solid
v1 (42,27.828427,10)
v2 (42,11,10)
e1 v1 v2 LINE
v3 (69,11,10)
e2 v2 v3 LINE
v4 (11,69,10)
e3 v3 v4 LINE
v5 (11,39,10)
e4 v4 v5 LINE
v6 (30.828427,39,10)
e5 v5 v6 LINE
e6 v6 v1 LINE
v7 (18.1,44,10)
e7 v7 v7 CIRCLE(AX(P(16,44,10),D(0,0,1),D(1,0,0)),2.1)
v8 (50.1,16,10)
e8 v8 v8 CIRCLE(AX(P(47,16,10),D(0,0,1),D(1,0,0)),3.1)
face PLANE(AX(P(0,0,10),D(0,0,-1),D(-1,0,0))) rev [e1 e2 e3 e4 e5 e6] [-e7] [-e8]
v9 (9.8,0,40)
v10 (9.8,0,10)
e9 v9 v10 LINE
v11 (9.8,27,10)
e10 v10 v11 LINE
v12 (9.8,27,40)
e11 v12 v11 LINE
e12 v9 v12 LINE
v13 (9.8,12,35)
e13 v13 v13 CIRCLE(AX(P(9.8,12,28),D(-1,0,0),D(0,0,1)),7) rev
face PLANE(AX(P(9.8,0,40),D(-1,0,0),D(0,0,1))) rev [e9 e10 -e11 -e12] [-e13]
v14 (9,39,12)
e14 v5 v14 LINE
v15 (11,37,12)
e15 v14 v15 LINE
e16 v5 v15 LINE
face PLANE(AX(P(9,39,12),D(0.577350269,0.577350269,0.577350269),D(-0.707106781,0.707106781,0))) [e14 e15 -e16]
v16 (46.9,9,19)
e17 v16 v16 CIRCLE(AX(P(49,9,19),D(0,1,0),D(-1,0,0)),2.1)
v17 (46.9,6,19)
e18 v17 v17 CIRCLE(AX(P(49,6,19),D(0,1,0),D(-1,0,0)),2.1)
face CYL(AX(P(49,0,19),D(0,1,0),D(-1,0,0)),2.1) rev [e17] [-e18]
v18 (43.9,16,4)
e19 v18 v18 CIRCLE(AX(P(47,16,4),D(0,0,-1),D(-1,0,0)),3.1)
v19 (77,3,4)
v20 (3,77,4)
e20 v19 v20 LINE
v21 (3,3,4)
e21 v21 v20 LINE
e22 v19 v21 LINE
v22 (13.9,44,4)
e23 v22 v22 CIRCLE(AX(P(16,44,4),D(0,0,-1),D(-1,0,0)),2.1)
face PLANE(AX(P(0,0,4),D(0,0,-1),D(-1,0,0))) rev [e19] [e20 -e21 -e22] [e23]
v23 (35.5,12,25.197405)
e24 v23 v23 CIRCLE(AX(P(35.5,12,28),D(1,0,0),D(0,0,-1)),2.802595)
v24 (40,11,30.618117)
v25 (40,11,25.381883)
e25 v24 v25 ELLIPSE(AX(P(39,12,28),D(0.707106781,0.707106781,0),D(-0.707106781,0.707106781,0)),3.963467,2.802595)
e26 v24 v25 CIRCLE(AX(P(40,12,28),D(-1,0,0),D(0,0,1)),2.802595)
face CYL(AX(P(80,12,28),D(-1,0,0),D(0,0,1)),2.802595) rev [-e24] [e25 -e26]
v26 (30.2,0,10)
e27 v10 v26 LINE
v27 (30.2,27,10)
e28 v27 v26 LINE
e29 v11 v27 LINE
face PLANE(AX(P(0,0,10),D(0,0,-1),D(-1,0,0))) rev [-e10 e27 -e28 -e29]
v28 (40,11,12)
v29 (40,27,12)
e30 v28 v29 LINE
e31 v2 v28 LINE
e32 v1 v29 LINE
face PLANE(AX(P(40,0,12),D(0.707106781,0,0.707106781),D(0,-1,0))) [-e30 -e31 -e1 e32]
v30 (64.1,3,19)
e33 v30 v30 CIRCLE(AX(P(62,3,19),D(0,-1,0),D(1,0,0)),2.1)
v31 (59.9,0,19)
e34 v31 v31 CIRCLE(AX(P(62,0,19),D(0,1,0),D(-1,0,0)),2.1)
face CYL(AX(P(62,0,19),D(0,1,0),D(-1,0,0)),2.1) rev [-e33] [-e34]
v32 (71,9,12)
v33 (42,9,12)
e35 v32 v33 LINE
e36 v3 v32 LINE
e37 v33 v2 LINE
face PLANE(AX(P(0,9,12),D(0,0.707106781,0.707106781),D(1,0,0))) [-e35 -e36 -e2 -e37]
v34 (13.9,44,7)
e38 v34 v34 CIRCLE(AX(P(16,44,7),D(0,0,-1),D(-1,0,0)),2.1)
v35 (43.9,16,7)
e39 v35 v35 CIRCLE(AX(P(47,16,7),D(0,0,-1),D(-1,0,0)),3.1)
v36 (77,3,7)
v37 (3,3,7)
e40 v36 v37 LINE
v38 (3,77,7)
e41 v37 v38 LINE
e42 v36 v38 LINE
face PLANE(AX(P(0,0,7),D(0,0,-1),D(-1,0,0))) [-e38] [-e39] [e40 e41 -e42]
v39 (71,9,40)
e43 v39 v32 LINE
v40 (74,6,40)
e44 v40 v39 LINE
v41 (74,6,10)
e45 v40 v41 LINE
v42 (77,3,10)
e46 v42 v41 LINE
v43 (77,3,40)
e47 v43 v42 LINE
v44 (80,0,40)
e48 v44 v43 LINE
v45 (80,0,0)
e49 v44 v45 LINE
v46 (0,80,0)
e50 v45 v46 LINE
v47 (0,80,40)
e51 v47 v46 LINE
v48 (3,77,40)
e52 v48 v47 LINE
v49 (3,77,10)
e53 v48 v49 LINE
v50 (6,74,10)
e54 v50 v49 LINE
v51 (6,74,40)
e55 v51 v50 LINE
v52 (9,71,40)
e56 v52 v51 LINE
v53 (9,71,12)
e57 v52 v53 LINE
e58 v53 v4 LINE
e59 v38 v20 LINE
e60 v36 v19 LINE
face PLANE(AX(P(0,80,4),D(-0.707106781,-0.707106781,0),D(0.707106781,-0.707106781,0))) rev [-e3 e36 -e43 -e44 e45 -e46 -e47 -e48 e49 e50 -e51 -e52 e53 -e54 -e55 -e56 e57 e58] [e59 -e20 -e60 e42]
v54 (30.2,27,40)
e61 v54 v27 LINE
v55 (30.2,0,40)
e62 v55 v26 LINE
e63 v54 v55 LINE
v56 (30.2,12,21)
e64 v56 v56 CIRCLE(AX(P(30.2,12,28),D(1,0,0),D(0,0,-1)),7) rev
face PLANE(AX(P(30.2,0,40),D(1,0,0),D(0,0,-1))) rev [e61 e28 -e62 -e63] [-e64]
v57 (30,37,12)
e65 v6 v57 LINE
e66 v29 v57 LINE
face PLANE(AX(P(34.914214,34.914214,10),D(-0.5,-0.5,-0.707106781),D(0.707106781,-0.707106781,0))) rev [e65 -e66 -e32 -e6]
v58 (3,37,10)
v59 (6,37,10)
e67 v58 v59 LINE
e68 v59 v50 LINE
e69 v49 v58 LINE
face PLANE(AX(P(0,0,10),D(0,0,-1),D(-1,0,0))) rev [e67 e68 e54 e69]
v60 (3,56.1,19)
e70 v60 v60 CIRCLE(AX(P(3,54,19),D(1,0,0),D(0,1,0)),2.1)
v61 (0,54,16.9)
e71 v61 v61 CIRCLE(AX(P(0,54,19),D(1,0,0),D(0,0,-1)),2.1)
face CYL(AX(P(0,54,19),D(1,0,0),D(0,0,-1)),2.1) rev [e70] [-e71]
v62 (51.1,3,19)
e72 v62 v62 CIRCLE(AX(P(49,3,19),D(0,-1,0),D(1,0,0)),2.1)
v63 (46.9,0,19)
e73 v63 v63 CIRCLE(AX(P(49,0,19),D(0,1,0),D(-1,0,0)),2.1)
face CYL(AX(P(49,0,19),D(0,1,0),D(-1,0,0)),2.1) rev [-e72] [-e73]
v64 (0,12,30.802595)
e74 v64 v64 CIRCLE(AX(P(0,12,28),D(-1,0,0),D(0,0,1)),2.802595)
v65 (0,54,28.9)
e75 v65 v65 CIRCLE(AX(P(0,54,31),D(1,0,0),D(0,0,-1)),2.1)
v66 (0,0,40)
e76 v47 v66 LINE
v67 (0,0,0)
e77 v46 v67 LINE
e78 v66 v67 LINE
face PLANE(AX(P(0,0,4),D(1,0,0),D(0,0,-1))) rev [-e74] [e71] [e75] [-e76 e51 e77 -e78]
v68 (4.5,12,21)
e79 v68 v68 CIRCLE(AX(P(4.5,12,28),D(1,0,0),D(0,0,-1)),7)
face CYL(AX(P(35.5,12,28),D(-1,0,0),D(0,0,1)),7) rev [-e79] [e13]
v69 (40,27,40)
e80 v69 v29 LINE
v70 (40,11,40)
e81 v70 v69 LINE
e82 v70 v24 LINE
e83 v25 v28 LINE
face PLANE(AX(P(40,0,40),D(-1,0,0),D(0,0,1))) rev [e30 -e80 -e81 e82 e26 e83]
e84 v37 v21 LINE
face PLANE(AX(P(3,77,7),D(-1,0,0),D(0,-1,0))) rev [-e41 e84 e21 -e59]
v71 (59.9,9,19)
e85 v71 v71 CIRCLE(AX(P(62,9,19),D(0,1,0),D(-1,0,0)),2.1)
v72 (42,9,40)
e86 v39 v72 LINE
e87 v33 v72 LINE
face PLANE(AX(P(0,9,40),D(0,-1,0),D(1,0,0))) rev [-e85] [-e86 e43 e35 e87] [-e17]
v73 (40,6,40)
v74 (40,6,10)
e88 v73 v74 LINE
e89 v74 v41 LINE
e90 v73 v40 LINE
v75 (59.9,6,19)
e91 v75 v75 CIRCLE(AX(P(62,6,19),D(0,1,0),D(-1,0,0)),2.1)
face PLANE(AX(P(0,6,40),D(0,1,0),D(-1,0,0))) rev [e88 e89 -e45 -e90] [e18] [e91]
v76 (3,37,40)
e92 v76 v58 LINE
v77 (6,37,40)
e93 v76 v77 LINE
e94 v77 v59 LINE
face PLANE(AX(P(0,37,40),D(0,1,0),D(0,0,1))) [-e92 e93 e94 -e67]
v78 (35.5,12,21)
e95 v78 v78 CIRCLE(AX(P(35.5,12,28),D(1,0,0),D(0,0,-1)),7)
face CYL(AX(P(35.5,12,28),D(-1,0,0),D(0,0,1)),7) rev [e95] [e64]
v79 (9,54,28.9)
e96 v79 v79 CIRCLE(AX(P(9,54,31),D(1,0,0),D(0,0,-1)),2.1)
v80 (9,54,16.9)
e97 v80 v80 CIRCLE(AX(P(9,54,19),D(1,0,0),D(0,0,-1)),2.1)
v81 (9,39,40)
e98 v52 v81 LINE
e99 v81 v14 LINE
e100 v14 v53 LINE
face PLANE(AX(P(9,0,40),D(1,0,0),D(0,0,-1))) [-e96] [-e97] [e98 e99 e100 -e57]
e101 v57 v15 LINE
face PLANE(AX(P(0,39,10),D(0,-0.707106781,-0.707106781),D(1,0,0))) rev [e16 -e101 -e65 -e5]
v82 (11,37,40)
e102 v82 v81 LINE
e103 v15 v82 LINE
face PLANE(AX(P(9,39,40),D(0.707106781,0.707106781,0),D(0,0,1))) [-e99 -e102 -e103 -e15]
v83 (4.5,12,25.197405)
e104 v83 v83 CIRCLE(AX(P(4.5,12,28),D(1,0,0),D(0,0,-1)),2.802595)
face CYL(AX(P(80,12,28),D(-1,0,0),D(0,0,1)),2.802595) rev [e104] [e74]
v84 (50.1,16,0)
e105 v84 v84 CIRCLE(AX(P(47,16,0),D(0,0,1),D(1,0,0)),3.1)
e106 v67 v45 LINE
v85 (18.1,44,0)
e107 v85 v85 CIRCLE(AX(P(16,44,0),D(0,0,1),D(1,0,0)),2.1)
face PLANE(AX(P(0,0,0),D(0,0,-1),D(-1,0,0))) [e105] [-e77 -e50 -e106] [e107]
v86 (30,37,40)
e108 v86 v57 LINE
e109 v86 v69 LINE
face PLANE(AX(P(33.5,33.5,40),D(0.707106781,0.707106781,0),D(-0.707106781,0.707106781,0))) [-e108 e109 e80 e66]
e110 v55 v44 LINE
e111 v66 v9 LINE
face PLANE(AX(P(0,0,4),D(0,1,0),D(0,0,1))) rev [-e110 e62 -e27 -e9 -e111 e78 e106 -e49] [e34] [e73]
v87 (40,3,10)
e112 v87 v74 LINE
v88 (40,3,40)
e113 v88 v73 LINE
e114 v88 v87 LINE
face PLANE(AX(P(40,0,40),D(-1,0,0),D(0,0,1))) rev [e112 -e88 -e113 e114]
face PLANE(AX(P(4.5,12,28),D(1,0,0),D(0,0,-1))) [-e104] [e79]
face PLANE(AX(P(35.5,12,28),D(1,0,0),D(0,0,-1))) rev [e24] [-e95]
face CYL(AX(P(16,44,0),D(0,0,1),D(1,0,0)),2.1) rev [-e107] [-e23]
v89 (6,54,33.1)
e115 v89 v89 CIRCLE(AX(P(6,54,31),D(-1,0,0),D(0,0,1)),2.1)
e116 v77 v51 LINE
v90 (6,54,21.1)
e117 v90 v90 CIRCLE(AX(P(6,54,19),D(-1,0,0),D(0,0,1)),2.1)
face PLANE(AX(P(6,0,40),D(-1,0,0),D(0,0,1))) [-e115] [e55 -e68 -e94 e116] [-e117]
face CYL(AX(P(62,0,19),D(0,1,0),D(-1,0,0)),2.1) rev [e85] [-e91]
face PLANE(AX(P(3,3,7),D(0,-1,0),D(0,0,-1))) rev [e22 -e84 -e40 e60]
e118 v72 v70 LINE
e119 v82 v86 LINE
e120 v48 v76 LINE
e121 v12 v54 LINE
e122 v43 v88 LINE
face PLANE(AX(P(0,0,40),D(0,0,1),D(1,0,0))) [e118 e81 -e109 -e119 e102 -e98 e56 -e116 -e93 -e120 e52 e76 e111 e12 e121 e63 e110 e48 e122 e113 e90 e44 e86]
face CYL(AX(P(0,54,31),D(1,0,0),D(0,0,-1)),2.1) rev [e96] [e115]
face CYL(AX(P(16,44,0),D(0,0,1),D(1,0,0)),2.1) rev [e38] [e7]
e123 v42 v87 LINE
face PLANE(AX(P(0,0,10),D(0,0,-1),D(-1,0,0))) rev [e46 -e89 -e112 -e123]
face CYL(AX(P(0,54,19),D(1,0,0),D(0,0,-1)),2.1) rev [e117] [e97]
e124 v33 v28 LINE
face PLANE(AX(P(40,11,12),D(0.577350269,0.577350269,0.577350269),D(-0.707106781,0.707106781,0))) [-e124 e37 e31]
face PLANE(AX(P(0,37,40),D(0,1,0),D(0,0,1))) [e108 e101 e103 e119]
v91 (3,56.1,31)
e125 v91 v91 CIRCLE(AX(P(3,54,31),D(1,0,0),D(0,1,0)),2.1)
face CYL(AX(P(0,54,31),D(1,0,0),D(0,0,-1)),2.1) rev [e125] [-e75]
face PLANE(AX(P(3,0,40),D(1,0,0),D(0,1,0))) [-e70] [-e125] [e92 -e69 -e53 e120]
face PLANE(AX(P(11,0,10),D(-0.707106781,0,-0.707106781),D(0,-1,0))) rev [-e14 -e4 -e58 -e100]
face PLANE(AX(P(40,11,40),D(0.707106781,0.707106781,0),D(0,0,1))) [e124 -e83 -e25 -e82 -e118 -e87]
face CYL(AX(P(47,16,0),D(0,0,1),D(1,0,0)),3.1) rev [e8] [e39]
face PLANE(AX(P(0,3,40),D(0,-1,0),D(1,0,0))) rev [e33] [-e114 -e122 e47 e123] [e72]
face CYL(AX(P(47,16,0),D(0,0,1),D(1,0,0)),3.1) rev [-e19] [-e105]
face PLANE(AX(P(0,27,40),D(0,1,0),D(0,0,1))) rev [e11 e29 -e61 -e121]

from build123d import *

# Parameters (mm, degrees)
DODANIE_WYCI_GNI_CIE1_DEPTH     = 4
DODANIE_WYCI_GNI_CIE2_DEPTH     = 3
DODANIE_WYCI_GNI_CIE3_DEPTH     = 3
DODANIE_WYCI_GNI_CIE4_DEPTH     = 30
WYTNIJ_WYCI_GNI_CIE1_DEPTH      = 15.5
WYTNIJ_WYCI_GNI_CIE1_DEPTH_BACK = 15.5
SZKIC5_R                        = 7
SZKIC6_R                        = 2.802594562
WYTNIJ_WYCI_GNI_CIE2_DEPTH      = 121
SFAZOWANIE1_SIZE                = 2
SZKIC7_R                        = 3.1
SZKIC7_R_2                      = 2.1
WYTNIJ_WYCI_GNI_CIE3_DEPTH      = 118.046999107
SZKIC8_R                        = 2.1
WYTNIJ_WYCI_GNI_CIE4_DEPTH      = 115.197197864
SZKIC9_R                        = 2.1
WYTNIJ_WYCI_GNI_CIE5_DEPTH      = 115.197197864


with BuildPart() as part:
    # Szkic1 → Dodanie-wyciągnięcie1 (new body)
    with BuildSketch(Plane.XY):
        Polygon((0, 0), (80, 0), (0, 80), align=None)
    extrude(amount=DODANIE_WYCI_GNI_CIE1_DEPTH)

    # Szkic2 → Dodanie-wyciągnięcie2 (add)
    with BuildSketch(Plane.XY.offset(4)):
        Polygon((3, 77), (3, 3), (77, 3), (80, 0), (0, 0), (0, 80), align=None)
    extrude(amount=DODANIE_WYCI_GNI_CIE2_DEPTH)

    # Szkic3 → Dodanie-wyciągnięcie3 (add)
    with BuildSketch(Plane.XY.offset(7)):
        Polygon((80, 0), (77, 3), (3, 77), (0, 80), (0, 0), align=None)
    extrude(amount=DODANIE_WYCI_GNI_CIE3_DEPTH)

    # Szkic4 → Dodanie-wyciągnięcie4 (add)
    with BuildSketch(Plane.XY.offset(10)):
        Polygon((30.2, 0), (80, 0), (77, 3), (40, 3), (40, 6), (74, 6), (71, 9), (40, 9), (40, 27), (30, 37), (9, 37), (9, 71), (6, 74), (6, 37), (3, 37), (3, 77), (0, 80), (0, 0), (9.8, 0), (9.8, 27), (30.2, 27), align=None)
    extrude(amount=DODANIE_WYCI_GNI_CIE4_DEPTH)

    # Szkic5 → Wytnij-wyciągnięcie1 (cut, two sides: drawn at the far end of the back side and taken through both)
    with BuildSketch(Plane(origin=(20, 0, 0), x_dir=(0, 0, -1), z_dir=(1, 0, 0)).offset(-WYTNIJ_WYCI_GNI_CIE1_DEPTH_BACK)):
        with Locations((-28, 12)):
            Circle(SZKIC5_R)
    extrude(amount=WYTNIJ_WYCI_GNI_CIE1_DEPTH + WYTNIJ_WYCI_GNI_CIE1_DEPTH_BACK, mode=Mode.SUBTRACT)

    # Szkic6 → Wytnij-wyciągnięcie2 (cut, through all)
    with BuildSketch(Plane.ZY):
        with Locations((28, 12)):
            Circle(SZKIC6_R)
    extrude(amount=-WYTNIJ_WYCI_GNI_CIE2_DEPTH, mode=Mode.SUBTRACT)

    # Sfazowanie1
    # the kernel refuses this chamfer: 2 mm, written as the material it adds along each edge
    with BuildSketch(Plane(origin=(10.333333333, 38.333333333, 11.333333333), x_dir=(-0.7071067811865475, 0.7071067811865475, 0), z_dir=(-0.5773502691896258, -0.5773502691896258, -0.5773502691896258))) as sfazowanie1_piece_1_section:
        Polygon((-1.414213562, -0.816496581), (1.414213562, -0.816496581), (0, 1.632993162), align=None)
    sfazowanie1_piece_1 = extrude(amount=2.540341184, mode=Mode.PRIVATE)
    sfazowanie1_piece_1 = split(sfazowanie1_piece_1, bisect_by=Plane(origin=(9, 37, 10), z_dir=(0, 1, 0)), keep=Keep.TOP, mode=Mode.PRIVATE)
    sfazowanie1_piece_1 = split(sfazowanie1_piece_1, bisect_by=Plane(origin=(9, 37, 10), z_dir=(1, 0, 0)), keep=Keep.TOP, mode=Mode.PRIVATE)
    sfazowanie1_piece_1 = split(sfazowanie1_piece_1, bisect_by=Plane(origin=(9, 37, 10), z_dir=(0, 0, 1)), keep=Keep.TOP, mode=Mode.PRIVATE)
    add(sfazowanie1_piece_1)
    with BuildSketch(Plane(origin=(41.333333333, 10.333333333, 11.333333333), x_dir=(0, -0.7071067811865475, 0.7071067811865475), z_dir=(-0.5773502691896258, -0.5773502691896258, -0.5773502691896258))) as sfazowanie1_piece_2_section:
        Polygon((-1.414213562, -0.816496581), (1.414213562, -0.816496581), (0, 1.632993162), align=None)
    sfazowanie1_piece_2 = extrude(amount=2.540341184, mode=Mode.PRIVATE)
    sfazowanie1_piece_2 = split(sfazowanie1_piece_2, bisect_by=Plane(origin=(40, 9, 10), z_dir=(0, 0, 1)), keep=Keep.TOP, mode=Mode.PRIVATE)
    sfazowanie1_piece_2 = split(sfazowanie1_piece_2, bisect_by=Plane(origin=(40, 9, 10), z_dir=(0, 1, 0)), keep=Keep.TOP, mode=Mode.PRIVATE)
    sfazowanie1_piece_2 = split(sfazowanie1_piece_2, bisect_by=Plane(origin=(40, 9, 10), z_dir=(1, 0, 0)), keep=Keep.TOP, mode=Mode.PRIVATE)
    add(sfazowanie1_piece_2)
    with BuildSketch(Plane(origin=(9, 37, 4.856634024), x_dir=(1, 0, 0), z_dir=(0, 0, 1))) as sfazowanie1_piece_3_section:
        Polygon((SFAZOWANIE1_SIZE, 0), (0, SFAZOWANIE1_SIZE), (0, 0), align=None)
    sfazowanie1_piece_3 = extrude(amount=35.143365976, mode=Mode.PRIVATE)
    sfazowanie1_piece_3 = split(sfazowanie1_piece_3, bisect_by=Plane(origin=(9, 37, 7), z_dir=(0, 0, 1)), keep=Keep.TOP, mode=Mode.PRIVATE)
    add(sfazowanie1_piece_3)
    with BuildSketch(Plane(origin=(76.143365976, 9, 10), x_dir=(0, 0, 1), z_dir=(-1, 0, 0))) as sfazowanie1_piece_4_section:
        Polygon((SFAZOWANIE1_SIZE, 0), (0, SFAZOWANIE1_SIZE), (0, 0), align=None)
    sfazowanie1_piece_4 = extrude(amount=41.286731952, mode=Mode.PRIVATE)
    sfazowanie1_piece_4 = split(sfazowanie1_piece_4, bisect_by=Plane(origin=(73.571682988, 6.428317012, 10), z_dir=(-0.7071067811865476, -0.7071067811865476, 0)), keep=Keep.TOP, mode=Mode.PRIVATE)
    add(sfazowanie1_piece_4)
    with BuildSketch(Plane(origin=(40, 9, 10), x_dir=(0, 0, 1), z_dir=(0, 1, 0))) as sfazowanie1_piece_5_section:
        Polygon((SFAZOWANIE1_SIZE, 0), (0, SFAZOWANIE1_SIZE), (0, 0), align=None)
    sfazowanie1_piece_5 = extrude(amount=23.143365976, mode=Mode.PRIVATE)
    sfazowanie1_piece_5 = split(sfazowanie1_piece_5, bisect_by=Plane(origin=(49, 18, 10), z_dir=(-0.7071067811865482, -0.7071067811865468, 0)), keep=Keep.TOP, mode=Mode.PRIVATE)
    add(sfazowanie1_piece_5)
    with BuildSketch(Plane(origin=(40, 9, 4.856634024), x_dir=(1, 0, 0), z_dir=(0, 0, 1))) as sfazowanie1_piece_6_section:
        Polygon((SFAZOWANIE1_SIZE, 0), (0, SFAZOWANIE1_SIZE), (0, 0), align=None)
    sfazowanie1_piece_6 = extrude(amount=35.143365976, mode=Mode.PRIVATE)
    sfazowanie1_piece_6 = split(sfazowanie1_piece_6, bisect_by=Plane(origin=(40, 9, 7), z_dir=(0, 0, 1)), keep=Keep.TOP, mode=Mode.PRIVATE)
    sfazowanie1_piece_6 = sfazowanie1_piece_6 - Plane(origin=(40, 12, 28), x_dir=(0, 0, 1), z_dir=(-1, 0, 0)) * Cylinder(2.802594562, 79, mode=Mode.PRIVATE)
    add(sfazowanie1_piece_6)
    with BuildSketch(Plane(origin=(43.63690896, 23.36309104, 10), x_dir=(0, 0, 1), z_dir=(-0.7071067811865468, 0.7071067811865482, 0))) as sfazowanie1_piece_7_section:
        Polygon((SFAZOWANIE1_SIZE, 0), (0, SFAZOWANIE1_SIZE), (0, 0), align=None)
    sfazowanie1_piece_7 = extrude(amount=24.428867576, mode=Mode.PRIVATE)
    sfazowanie1_piece_7 = split(sfazowanie1_piece_7, bisect_by=Plane(origin=(40, 23.36309104, 10), z_dir=(-1, 0, 0)), keep=Keep.TOP, mode=Mode.PRIVATE)
    sfazowanie1_piece_7 = split(sfazowanie1_piece_7, bisect_by=Plane(origin=(43.63690896, 37, 10), z_dir=(0, -1, 0)), keep=Keep.TOP, mode=Mode.PRIVATE)
    add(sfazowanie1_piece_7)
    with BuildSketch(Plane(origin=(9, 31.856634024, 10), x_dir=(0, 0, 1), z_dir=(0, 1, 0))) as sfazowanie1_piece_8_section:
        Polygon((SFAZOWANIE1_SIZE, 0), (0, SFAZOWANIE1_SIZE), (0, 0), align=None)
    sfazowanie1_piece_8 = extrude(amount=44.286731952, mode=Mode.PRIVATE)
    sfazowanie1_piece_8 = split(sfazowanie1_piece_8, bisect_by=Plane(origin=(28.571682988, 51.428317012, 10), z_dir=(-0.7071067811865476, -0.7071067811865476, 0)), keep=Keep.TOP, mode=Mode.PRIVATE)
    add(sfazowanie1_piece_8)
    with BuildSketch(Plane(origin=(35.143365976, 37, 10), x_dir=(0, 0, 1), z_dir=(-1, 0, 0))) as sfazowanie1_piece_9_section:
        Polygon((SFAZOWANIE1_SIZE, 0), (0, SFAZOWANIE1_SIZE), (0, 0), align=None)
    sfazowanie1_piece_9 = extrude(amount=31.286731952, mode=Mode.PRIVATE)
    sfazowanie1_piece_9 = split(sfazowanie1_piece_9, bisect_by=Plane(origin=(32.571682988, 34.428317012, 10), z_dir=(-0.7071067811865482, -0.7071067811865468, 0)), keep=Keep.TOP, mode=Mode.PRIVATE)
    sfazowanie1_piece_9 = split(sfazowanie1_piece_9, bisect_by=Plane(origin=(6, 37, 10), z_dir=(1, 0, 0)), keep=Keep.TOP, mode=Mode.PRIVATE)
    add(sfazowanie1_piece_9)
    with BuildSketch(Plane(origin=(40, 9, 10), x_dir=(0, 0, 1), z_dir=(0, 1, 0))) as sfazowanie1_piece_10a_section:
        Polygon((SFAZOWANIE1_SIZE, 0), (0, SFAZOWANIE1_SIZE), (0, 0), align=None)
    sfazowanie1_piece_10a = extrude(amount=23.143365976, mode=Mode.PRIVATE)
    sfazowanie1_piece_10a = split(sfazowanie1_piece_10a, bisect_by=Plane(origin=(49, 18, 10), z_dir=(0.7071067811865482, 0.7071067811865468, 0)), keep=Keep.TOP, mode=Mode.PRIVATE)
    with BuildSketch(Plane(origin=(43.63690896, 23.36309104, 10), x_dir=(0, 0, 1), z_dir=(-0.7071067811865468, 0.7071067811865482, 0))) as sfazowanie1_piece_10b_section:
        Polygon((SFAZOWANIE1_SIZE, 0), (0, SFAZOWANIE1_SIZE), (0, 0), align=None)
    sfazowanie1_piece_10b = extrude(amount=24.428867576, mode=Mode.PRIVATE)
    sfazowanie1_piece_10b = split(sfazowanie1_piece_10b, bisect_by=Plane(origin=(40, 23.36309104, 10), z_dir=(1, 0, 0)), keep=Keep.TOP, mode=Mode.PRIVATE)
    sfazowanie1_piece_10 = sfazowanie1_piece_10a & sfazowanie1_piece_10b
    add(sfazowanie1_piece_10)
    with BuildSketch(Plane(origin=(43.63690896, 23.36309104, 10), x_dir=(0, 0, 1), z_dir=(-0.7071067811865468, 0.7071067811865482, 0))) as sfazowanie1_piece_11a_section:
        Polygon((SFAZOWANIE1_SIZE, 0), (0, SFAZOWANIE1_SIZE), (0, 0), align=None)
    sfazowanie1_piece_11a = extrude(amount=24.428867576, mode=Mode.PRIVATE)
    sfazowanie1_piece_11a = split(sfazowanie1_piece_11a, bisect_by=Plane(origin=(43.63690896, 37, 10), z_dir=(0, 1, 0)), keep=Keep.TOP, mode=Mode.PRIVATE)
    with BuildSketch(Plane(origin=(35.143365976, 37, 10), x_dir=(0, 0, 1), z_dir=(-1, 0, 0))) as sfazowanie1_piece_11b_section:
        Polygon((SFAZOWANIE1_SIZE, 0), (0, SFAZOWANIE1_SIZE), (0, 0), align=None)
    sfazowanie1_piece_11b = extrude(amount=26.143365976, mode=Mode.PRIVATE)
    sfazowanie1_piece_11b = split(sfazowanie1_piece_11b, bisect_by=Plane(origin=(32.571682988, 34.428317012, 10), z_dir=(0.7071067811865482, 0.7071067811865468, 0)), keep=Keep.TOP, mode=Mode.PRIVATE)
    sfazowanie1_piece_11 = sfazowanie1_piece_11a & sfazowanie1_piece_11b
    add(sfazowanie1_piece_11)

    # Szkic7 → Wytnij-wyciągnięcie3 (cut, through all)
    with BuildSketch(Plane.XY.offset(10)):
        with Locations((47, 16)):
            Circle(SZKIC7_R)
        with Locations((16, 44)):
            Circle(SZKIC7_R_2)
    extrude(amount=-WYTNIJ_WYCI_GNI_CIE3_DEPTH, mode=Mode.SUBTRACT)

    # Szkic8 → Wytnij-wyciągnięcie4 (cut, through all)
    with BuildSketch(Plane(origin=(0, 9, 0), x_dir=(1, 0, 0), z_dir=(0, 1, 0))):
        with Locations(Location((49, -19, 0), (0, 0, 180))):
            Circle(SZKIC8_R)
        with Locations(Location((62, -19, 0), (0, 0, 180))):
            Circle(SZKIC8_R)
    extrude(amount=-WYTNIJ_WYCI_GNI_CIE4_DEPTH, mode=Mode.SUBTRACT)

    # Szkic9 → Wytnij-wyciągnięcie5 (cut, through all)
    with BuildSketch(Plane(origin=(9, 0, 0), x_dir=(0, 0, -1), z_dir=(1, 0, 0))):
        with Locations((-31, 54)):
            Circle(SZKIC9_R)
        with Locations((-19, 54)):
            Circle(SZKIC9_R)
    extrude(amount=-WYTNIJ_WYCI_GNI_CIE5_DEPTH, mode=Mode.SUBTRACT)


solid = part.part
